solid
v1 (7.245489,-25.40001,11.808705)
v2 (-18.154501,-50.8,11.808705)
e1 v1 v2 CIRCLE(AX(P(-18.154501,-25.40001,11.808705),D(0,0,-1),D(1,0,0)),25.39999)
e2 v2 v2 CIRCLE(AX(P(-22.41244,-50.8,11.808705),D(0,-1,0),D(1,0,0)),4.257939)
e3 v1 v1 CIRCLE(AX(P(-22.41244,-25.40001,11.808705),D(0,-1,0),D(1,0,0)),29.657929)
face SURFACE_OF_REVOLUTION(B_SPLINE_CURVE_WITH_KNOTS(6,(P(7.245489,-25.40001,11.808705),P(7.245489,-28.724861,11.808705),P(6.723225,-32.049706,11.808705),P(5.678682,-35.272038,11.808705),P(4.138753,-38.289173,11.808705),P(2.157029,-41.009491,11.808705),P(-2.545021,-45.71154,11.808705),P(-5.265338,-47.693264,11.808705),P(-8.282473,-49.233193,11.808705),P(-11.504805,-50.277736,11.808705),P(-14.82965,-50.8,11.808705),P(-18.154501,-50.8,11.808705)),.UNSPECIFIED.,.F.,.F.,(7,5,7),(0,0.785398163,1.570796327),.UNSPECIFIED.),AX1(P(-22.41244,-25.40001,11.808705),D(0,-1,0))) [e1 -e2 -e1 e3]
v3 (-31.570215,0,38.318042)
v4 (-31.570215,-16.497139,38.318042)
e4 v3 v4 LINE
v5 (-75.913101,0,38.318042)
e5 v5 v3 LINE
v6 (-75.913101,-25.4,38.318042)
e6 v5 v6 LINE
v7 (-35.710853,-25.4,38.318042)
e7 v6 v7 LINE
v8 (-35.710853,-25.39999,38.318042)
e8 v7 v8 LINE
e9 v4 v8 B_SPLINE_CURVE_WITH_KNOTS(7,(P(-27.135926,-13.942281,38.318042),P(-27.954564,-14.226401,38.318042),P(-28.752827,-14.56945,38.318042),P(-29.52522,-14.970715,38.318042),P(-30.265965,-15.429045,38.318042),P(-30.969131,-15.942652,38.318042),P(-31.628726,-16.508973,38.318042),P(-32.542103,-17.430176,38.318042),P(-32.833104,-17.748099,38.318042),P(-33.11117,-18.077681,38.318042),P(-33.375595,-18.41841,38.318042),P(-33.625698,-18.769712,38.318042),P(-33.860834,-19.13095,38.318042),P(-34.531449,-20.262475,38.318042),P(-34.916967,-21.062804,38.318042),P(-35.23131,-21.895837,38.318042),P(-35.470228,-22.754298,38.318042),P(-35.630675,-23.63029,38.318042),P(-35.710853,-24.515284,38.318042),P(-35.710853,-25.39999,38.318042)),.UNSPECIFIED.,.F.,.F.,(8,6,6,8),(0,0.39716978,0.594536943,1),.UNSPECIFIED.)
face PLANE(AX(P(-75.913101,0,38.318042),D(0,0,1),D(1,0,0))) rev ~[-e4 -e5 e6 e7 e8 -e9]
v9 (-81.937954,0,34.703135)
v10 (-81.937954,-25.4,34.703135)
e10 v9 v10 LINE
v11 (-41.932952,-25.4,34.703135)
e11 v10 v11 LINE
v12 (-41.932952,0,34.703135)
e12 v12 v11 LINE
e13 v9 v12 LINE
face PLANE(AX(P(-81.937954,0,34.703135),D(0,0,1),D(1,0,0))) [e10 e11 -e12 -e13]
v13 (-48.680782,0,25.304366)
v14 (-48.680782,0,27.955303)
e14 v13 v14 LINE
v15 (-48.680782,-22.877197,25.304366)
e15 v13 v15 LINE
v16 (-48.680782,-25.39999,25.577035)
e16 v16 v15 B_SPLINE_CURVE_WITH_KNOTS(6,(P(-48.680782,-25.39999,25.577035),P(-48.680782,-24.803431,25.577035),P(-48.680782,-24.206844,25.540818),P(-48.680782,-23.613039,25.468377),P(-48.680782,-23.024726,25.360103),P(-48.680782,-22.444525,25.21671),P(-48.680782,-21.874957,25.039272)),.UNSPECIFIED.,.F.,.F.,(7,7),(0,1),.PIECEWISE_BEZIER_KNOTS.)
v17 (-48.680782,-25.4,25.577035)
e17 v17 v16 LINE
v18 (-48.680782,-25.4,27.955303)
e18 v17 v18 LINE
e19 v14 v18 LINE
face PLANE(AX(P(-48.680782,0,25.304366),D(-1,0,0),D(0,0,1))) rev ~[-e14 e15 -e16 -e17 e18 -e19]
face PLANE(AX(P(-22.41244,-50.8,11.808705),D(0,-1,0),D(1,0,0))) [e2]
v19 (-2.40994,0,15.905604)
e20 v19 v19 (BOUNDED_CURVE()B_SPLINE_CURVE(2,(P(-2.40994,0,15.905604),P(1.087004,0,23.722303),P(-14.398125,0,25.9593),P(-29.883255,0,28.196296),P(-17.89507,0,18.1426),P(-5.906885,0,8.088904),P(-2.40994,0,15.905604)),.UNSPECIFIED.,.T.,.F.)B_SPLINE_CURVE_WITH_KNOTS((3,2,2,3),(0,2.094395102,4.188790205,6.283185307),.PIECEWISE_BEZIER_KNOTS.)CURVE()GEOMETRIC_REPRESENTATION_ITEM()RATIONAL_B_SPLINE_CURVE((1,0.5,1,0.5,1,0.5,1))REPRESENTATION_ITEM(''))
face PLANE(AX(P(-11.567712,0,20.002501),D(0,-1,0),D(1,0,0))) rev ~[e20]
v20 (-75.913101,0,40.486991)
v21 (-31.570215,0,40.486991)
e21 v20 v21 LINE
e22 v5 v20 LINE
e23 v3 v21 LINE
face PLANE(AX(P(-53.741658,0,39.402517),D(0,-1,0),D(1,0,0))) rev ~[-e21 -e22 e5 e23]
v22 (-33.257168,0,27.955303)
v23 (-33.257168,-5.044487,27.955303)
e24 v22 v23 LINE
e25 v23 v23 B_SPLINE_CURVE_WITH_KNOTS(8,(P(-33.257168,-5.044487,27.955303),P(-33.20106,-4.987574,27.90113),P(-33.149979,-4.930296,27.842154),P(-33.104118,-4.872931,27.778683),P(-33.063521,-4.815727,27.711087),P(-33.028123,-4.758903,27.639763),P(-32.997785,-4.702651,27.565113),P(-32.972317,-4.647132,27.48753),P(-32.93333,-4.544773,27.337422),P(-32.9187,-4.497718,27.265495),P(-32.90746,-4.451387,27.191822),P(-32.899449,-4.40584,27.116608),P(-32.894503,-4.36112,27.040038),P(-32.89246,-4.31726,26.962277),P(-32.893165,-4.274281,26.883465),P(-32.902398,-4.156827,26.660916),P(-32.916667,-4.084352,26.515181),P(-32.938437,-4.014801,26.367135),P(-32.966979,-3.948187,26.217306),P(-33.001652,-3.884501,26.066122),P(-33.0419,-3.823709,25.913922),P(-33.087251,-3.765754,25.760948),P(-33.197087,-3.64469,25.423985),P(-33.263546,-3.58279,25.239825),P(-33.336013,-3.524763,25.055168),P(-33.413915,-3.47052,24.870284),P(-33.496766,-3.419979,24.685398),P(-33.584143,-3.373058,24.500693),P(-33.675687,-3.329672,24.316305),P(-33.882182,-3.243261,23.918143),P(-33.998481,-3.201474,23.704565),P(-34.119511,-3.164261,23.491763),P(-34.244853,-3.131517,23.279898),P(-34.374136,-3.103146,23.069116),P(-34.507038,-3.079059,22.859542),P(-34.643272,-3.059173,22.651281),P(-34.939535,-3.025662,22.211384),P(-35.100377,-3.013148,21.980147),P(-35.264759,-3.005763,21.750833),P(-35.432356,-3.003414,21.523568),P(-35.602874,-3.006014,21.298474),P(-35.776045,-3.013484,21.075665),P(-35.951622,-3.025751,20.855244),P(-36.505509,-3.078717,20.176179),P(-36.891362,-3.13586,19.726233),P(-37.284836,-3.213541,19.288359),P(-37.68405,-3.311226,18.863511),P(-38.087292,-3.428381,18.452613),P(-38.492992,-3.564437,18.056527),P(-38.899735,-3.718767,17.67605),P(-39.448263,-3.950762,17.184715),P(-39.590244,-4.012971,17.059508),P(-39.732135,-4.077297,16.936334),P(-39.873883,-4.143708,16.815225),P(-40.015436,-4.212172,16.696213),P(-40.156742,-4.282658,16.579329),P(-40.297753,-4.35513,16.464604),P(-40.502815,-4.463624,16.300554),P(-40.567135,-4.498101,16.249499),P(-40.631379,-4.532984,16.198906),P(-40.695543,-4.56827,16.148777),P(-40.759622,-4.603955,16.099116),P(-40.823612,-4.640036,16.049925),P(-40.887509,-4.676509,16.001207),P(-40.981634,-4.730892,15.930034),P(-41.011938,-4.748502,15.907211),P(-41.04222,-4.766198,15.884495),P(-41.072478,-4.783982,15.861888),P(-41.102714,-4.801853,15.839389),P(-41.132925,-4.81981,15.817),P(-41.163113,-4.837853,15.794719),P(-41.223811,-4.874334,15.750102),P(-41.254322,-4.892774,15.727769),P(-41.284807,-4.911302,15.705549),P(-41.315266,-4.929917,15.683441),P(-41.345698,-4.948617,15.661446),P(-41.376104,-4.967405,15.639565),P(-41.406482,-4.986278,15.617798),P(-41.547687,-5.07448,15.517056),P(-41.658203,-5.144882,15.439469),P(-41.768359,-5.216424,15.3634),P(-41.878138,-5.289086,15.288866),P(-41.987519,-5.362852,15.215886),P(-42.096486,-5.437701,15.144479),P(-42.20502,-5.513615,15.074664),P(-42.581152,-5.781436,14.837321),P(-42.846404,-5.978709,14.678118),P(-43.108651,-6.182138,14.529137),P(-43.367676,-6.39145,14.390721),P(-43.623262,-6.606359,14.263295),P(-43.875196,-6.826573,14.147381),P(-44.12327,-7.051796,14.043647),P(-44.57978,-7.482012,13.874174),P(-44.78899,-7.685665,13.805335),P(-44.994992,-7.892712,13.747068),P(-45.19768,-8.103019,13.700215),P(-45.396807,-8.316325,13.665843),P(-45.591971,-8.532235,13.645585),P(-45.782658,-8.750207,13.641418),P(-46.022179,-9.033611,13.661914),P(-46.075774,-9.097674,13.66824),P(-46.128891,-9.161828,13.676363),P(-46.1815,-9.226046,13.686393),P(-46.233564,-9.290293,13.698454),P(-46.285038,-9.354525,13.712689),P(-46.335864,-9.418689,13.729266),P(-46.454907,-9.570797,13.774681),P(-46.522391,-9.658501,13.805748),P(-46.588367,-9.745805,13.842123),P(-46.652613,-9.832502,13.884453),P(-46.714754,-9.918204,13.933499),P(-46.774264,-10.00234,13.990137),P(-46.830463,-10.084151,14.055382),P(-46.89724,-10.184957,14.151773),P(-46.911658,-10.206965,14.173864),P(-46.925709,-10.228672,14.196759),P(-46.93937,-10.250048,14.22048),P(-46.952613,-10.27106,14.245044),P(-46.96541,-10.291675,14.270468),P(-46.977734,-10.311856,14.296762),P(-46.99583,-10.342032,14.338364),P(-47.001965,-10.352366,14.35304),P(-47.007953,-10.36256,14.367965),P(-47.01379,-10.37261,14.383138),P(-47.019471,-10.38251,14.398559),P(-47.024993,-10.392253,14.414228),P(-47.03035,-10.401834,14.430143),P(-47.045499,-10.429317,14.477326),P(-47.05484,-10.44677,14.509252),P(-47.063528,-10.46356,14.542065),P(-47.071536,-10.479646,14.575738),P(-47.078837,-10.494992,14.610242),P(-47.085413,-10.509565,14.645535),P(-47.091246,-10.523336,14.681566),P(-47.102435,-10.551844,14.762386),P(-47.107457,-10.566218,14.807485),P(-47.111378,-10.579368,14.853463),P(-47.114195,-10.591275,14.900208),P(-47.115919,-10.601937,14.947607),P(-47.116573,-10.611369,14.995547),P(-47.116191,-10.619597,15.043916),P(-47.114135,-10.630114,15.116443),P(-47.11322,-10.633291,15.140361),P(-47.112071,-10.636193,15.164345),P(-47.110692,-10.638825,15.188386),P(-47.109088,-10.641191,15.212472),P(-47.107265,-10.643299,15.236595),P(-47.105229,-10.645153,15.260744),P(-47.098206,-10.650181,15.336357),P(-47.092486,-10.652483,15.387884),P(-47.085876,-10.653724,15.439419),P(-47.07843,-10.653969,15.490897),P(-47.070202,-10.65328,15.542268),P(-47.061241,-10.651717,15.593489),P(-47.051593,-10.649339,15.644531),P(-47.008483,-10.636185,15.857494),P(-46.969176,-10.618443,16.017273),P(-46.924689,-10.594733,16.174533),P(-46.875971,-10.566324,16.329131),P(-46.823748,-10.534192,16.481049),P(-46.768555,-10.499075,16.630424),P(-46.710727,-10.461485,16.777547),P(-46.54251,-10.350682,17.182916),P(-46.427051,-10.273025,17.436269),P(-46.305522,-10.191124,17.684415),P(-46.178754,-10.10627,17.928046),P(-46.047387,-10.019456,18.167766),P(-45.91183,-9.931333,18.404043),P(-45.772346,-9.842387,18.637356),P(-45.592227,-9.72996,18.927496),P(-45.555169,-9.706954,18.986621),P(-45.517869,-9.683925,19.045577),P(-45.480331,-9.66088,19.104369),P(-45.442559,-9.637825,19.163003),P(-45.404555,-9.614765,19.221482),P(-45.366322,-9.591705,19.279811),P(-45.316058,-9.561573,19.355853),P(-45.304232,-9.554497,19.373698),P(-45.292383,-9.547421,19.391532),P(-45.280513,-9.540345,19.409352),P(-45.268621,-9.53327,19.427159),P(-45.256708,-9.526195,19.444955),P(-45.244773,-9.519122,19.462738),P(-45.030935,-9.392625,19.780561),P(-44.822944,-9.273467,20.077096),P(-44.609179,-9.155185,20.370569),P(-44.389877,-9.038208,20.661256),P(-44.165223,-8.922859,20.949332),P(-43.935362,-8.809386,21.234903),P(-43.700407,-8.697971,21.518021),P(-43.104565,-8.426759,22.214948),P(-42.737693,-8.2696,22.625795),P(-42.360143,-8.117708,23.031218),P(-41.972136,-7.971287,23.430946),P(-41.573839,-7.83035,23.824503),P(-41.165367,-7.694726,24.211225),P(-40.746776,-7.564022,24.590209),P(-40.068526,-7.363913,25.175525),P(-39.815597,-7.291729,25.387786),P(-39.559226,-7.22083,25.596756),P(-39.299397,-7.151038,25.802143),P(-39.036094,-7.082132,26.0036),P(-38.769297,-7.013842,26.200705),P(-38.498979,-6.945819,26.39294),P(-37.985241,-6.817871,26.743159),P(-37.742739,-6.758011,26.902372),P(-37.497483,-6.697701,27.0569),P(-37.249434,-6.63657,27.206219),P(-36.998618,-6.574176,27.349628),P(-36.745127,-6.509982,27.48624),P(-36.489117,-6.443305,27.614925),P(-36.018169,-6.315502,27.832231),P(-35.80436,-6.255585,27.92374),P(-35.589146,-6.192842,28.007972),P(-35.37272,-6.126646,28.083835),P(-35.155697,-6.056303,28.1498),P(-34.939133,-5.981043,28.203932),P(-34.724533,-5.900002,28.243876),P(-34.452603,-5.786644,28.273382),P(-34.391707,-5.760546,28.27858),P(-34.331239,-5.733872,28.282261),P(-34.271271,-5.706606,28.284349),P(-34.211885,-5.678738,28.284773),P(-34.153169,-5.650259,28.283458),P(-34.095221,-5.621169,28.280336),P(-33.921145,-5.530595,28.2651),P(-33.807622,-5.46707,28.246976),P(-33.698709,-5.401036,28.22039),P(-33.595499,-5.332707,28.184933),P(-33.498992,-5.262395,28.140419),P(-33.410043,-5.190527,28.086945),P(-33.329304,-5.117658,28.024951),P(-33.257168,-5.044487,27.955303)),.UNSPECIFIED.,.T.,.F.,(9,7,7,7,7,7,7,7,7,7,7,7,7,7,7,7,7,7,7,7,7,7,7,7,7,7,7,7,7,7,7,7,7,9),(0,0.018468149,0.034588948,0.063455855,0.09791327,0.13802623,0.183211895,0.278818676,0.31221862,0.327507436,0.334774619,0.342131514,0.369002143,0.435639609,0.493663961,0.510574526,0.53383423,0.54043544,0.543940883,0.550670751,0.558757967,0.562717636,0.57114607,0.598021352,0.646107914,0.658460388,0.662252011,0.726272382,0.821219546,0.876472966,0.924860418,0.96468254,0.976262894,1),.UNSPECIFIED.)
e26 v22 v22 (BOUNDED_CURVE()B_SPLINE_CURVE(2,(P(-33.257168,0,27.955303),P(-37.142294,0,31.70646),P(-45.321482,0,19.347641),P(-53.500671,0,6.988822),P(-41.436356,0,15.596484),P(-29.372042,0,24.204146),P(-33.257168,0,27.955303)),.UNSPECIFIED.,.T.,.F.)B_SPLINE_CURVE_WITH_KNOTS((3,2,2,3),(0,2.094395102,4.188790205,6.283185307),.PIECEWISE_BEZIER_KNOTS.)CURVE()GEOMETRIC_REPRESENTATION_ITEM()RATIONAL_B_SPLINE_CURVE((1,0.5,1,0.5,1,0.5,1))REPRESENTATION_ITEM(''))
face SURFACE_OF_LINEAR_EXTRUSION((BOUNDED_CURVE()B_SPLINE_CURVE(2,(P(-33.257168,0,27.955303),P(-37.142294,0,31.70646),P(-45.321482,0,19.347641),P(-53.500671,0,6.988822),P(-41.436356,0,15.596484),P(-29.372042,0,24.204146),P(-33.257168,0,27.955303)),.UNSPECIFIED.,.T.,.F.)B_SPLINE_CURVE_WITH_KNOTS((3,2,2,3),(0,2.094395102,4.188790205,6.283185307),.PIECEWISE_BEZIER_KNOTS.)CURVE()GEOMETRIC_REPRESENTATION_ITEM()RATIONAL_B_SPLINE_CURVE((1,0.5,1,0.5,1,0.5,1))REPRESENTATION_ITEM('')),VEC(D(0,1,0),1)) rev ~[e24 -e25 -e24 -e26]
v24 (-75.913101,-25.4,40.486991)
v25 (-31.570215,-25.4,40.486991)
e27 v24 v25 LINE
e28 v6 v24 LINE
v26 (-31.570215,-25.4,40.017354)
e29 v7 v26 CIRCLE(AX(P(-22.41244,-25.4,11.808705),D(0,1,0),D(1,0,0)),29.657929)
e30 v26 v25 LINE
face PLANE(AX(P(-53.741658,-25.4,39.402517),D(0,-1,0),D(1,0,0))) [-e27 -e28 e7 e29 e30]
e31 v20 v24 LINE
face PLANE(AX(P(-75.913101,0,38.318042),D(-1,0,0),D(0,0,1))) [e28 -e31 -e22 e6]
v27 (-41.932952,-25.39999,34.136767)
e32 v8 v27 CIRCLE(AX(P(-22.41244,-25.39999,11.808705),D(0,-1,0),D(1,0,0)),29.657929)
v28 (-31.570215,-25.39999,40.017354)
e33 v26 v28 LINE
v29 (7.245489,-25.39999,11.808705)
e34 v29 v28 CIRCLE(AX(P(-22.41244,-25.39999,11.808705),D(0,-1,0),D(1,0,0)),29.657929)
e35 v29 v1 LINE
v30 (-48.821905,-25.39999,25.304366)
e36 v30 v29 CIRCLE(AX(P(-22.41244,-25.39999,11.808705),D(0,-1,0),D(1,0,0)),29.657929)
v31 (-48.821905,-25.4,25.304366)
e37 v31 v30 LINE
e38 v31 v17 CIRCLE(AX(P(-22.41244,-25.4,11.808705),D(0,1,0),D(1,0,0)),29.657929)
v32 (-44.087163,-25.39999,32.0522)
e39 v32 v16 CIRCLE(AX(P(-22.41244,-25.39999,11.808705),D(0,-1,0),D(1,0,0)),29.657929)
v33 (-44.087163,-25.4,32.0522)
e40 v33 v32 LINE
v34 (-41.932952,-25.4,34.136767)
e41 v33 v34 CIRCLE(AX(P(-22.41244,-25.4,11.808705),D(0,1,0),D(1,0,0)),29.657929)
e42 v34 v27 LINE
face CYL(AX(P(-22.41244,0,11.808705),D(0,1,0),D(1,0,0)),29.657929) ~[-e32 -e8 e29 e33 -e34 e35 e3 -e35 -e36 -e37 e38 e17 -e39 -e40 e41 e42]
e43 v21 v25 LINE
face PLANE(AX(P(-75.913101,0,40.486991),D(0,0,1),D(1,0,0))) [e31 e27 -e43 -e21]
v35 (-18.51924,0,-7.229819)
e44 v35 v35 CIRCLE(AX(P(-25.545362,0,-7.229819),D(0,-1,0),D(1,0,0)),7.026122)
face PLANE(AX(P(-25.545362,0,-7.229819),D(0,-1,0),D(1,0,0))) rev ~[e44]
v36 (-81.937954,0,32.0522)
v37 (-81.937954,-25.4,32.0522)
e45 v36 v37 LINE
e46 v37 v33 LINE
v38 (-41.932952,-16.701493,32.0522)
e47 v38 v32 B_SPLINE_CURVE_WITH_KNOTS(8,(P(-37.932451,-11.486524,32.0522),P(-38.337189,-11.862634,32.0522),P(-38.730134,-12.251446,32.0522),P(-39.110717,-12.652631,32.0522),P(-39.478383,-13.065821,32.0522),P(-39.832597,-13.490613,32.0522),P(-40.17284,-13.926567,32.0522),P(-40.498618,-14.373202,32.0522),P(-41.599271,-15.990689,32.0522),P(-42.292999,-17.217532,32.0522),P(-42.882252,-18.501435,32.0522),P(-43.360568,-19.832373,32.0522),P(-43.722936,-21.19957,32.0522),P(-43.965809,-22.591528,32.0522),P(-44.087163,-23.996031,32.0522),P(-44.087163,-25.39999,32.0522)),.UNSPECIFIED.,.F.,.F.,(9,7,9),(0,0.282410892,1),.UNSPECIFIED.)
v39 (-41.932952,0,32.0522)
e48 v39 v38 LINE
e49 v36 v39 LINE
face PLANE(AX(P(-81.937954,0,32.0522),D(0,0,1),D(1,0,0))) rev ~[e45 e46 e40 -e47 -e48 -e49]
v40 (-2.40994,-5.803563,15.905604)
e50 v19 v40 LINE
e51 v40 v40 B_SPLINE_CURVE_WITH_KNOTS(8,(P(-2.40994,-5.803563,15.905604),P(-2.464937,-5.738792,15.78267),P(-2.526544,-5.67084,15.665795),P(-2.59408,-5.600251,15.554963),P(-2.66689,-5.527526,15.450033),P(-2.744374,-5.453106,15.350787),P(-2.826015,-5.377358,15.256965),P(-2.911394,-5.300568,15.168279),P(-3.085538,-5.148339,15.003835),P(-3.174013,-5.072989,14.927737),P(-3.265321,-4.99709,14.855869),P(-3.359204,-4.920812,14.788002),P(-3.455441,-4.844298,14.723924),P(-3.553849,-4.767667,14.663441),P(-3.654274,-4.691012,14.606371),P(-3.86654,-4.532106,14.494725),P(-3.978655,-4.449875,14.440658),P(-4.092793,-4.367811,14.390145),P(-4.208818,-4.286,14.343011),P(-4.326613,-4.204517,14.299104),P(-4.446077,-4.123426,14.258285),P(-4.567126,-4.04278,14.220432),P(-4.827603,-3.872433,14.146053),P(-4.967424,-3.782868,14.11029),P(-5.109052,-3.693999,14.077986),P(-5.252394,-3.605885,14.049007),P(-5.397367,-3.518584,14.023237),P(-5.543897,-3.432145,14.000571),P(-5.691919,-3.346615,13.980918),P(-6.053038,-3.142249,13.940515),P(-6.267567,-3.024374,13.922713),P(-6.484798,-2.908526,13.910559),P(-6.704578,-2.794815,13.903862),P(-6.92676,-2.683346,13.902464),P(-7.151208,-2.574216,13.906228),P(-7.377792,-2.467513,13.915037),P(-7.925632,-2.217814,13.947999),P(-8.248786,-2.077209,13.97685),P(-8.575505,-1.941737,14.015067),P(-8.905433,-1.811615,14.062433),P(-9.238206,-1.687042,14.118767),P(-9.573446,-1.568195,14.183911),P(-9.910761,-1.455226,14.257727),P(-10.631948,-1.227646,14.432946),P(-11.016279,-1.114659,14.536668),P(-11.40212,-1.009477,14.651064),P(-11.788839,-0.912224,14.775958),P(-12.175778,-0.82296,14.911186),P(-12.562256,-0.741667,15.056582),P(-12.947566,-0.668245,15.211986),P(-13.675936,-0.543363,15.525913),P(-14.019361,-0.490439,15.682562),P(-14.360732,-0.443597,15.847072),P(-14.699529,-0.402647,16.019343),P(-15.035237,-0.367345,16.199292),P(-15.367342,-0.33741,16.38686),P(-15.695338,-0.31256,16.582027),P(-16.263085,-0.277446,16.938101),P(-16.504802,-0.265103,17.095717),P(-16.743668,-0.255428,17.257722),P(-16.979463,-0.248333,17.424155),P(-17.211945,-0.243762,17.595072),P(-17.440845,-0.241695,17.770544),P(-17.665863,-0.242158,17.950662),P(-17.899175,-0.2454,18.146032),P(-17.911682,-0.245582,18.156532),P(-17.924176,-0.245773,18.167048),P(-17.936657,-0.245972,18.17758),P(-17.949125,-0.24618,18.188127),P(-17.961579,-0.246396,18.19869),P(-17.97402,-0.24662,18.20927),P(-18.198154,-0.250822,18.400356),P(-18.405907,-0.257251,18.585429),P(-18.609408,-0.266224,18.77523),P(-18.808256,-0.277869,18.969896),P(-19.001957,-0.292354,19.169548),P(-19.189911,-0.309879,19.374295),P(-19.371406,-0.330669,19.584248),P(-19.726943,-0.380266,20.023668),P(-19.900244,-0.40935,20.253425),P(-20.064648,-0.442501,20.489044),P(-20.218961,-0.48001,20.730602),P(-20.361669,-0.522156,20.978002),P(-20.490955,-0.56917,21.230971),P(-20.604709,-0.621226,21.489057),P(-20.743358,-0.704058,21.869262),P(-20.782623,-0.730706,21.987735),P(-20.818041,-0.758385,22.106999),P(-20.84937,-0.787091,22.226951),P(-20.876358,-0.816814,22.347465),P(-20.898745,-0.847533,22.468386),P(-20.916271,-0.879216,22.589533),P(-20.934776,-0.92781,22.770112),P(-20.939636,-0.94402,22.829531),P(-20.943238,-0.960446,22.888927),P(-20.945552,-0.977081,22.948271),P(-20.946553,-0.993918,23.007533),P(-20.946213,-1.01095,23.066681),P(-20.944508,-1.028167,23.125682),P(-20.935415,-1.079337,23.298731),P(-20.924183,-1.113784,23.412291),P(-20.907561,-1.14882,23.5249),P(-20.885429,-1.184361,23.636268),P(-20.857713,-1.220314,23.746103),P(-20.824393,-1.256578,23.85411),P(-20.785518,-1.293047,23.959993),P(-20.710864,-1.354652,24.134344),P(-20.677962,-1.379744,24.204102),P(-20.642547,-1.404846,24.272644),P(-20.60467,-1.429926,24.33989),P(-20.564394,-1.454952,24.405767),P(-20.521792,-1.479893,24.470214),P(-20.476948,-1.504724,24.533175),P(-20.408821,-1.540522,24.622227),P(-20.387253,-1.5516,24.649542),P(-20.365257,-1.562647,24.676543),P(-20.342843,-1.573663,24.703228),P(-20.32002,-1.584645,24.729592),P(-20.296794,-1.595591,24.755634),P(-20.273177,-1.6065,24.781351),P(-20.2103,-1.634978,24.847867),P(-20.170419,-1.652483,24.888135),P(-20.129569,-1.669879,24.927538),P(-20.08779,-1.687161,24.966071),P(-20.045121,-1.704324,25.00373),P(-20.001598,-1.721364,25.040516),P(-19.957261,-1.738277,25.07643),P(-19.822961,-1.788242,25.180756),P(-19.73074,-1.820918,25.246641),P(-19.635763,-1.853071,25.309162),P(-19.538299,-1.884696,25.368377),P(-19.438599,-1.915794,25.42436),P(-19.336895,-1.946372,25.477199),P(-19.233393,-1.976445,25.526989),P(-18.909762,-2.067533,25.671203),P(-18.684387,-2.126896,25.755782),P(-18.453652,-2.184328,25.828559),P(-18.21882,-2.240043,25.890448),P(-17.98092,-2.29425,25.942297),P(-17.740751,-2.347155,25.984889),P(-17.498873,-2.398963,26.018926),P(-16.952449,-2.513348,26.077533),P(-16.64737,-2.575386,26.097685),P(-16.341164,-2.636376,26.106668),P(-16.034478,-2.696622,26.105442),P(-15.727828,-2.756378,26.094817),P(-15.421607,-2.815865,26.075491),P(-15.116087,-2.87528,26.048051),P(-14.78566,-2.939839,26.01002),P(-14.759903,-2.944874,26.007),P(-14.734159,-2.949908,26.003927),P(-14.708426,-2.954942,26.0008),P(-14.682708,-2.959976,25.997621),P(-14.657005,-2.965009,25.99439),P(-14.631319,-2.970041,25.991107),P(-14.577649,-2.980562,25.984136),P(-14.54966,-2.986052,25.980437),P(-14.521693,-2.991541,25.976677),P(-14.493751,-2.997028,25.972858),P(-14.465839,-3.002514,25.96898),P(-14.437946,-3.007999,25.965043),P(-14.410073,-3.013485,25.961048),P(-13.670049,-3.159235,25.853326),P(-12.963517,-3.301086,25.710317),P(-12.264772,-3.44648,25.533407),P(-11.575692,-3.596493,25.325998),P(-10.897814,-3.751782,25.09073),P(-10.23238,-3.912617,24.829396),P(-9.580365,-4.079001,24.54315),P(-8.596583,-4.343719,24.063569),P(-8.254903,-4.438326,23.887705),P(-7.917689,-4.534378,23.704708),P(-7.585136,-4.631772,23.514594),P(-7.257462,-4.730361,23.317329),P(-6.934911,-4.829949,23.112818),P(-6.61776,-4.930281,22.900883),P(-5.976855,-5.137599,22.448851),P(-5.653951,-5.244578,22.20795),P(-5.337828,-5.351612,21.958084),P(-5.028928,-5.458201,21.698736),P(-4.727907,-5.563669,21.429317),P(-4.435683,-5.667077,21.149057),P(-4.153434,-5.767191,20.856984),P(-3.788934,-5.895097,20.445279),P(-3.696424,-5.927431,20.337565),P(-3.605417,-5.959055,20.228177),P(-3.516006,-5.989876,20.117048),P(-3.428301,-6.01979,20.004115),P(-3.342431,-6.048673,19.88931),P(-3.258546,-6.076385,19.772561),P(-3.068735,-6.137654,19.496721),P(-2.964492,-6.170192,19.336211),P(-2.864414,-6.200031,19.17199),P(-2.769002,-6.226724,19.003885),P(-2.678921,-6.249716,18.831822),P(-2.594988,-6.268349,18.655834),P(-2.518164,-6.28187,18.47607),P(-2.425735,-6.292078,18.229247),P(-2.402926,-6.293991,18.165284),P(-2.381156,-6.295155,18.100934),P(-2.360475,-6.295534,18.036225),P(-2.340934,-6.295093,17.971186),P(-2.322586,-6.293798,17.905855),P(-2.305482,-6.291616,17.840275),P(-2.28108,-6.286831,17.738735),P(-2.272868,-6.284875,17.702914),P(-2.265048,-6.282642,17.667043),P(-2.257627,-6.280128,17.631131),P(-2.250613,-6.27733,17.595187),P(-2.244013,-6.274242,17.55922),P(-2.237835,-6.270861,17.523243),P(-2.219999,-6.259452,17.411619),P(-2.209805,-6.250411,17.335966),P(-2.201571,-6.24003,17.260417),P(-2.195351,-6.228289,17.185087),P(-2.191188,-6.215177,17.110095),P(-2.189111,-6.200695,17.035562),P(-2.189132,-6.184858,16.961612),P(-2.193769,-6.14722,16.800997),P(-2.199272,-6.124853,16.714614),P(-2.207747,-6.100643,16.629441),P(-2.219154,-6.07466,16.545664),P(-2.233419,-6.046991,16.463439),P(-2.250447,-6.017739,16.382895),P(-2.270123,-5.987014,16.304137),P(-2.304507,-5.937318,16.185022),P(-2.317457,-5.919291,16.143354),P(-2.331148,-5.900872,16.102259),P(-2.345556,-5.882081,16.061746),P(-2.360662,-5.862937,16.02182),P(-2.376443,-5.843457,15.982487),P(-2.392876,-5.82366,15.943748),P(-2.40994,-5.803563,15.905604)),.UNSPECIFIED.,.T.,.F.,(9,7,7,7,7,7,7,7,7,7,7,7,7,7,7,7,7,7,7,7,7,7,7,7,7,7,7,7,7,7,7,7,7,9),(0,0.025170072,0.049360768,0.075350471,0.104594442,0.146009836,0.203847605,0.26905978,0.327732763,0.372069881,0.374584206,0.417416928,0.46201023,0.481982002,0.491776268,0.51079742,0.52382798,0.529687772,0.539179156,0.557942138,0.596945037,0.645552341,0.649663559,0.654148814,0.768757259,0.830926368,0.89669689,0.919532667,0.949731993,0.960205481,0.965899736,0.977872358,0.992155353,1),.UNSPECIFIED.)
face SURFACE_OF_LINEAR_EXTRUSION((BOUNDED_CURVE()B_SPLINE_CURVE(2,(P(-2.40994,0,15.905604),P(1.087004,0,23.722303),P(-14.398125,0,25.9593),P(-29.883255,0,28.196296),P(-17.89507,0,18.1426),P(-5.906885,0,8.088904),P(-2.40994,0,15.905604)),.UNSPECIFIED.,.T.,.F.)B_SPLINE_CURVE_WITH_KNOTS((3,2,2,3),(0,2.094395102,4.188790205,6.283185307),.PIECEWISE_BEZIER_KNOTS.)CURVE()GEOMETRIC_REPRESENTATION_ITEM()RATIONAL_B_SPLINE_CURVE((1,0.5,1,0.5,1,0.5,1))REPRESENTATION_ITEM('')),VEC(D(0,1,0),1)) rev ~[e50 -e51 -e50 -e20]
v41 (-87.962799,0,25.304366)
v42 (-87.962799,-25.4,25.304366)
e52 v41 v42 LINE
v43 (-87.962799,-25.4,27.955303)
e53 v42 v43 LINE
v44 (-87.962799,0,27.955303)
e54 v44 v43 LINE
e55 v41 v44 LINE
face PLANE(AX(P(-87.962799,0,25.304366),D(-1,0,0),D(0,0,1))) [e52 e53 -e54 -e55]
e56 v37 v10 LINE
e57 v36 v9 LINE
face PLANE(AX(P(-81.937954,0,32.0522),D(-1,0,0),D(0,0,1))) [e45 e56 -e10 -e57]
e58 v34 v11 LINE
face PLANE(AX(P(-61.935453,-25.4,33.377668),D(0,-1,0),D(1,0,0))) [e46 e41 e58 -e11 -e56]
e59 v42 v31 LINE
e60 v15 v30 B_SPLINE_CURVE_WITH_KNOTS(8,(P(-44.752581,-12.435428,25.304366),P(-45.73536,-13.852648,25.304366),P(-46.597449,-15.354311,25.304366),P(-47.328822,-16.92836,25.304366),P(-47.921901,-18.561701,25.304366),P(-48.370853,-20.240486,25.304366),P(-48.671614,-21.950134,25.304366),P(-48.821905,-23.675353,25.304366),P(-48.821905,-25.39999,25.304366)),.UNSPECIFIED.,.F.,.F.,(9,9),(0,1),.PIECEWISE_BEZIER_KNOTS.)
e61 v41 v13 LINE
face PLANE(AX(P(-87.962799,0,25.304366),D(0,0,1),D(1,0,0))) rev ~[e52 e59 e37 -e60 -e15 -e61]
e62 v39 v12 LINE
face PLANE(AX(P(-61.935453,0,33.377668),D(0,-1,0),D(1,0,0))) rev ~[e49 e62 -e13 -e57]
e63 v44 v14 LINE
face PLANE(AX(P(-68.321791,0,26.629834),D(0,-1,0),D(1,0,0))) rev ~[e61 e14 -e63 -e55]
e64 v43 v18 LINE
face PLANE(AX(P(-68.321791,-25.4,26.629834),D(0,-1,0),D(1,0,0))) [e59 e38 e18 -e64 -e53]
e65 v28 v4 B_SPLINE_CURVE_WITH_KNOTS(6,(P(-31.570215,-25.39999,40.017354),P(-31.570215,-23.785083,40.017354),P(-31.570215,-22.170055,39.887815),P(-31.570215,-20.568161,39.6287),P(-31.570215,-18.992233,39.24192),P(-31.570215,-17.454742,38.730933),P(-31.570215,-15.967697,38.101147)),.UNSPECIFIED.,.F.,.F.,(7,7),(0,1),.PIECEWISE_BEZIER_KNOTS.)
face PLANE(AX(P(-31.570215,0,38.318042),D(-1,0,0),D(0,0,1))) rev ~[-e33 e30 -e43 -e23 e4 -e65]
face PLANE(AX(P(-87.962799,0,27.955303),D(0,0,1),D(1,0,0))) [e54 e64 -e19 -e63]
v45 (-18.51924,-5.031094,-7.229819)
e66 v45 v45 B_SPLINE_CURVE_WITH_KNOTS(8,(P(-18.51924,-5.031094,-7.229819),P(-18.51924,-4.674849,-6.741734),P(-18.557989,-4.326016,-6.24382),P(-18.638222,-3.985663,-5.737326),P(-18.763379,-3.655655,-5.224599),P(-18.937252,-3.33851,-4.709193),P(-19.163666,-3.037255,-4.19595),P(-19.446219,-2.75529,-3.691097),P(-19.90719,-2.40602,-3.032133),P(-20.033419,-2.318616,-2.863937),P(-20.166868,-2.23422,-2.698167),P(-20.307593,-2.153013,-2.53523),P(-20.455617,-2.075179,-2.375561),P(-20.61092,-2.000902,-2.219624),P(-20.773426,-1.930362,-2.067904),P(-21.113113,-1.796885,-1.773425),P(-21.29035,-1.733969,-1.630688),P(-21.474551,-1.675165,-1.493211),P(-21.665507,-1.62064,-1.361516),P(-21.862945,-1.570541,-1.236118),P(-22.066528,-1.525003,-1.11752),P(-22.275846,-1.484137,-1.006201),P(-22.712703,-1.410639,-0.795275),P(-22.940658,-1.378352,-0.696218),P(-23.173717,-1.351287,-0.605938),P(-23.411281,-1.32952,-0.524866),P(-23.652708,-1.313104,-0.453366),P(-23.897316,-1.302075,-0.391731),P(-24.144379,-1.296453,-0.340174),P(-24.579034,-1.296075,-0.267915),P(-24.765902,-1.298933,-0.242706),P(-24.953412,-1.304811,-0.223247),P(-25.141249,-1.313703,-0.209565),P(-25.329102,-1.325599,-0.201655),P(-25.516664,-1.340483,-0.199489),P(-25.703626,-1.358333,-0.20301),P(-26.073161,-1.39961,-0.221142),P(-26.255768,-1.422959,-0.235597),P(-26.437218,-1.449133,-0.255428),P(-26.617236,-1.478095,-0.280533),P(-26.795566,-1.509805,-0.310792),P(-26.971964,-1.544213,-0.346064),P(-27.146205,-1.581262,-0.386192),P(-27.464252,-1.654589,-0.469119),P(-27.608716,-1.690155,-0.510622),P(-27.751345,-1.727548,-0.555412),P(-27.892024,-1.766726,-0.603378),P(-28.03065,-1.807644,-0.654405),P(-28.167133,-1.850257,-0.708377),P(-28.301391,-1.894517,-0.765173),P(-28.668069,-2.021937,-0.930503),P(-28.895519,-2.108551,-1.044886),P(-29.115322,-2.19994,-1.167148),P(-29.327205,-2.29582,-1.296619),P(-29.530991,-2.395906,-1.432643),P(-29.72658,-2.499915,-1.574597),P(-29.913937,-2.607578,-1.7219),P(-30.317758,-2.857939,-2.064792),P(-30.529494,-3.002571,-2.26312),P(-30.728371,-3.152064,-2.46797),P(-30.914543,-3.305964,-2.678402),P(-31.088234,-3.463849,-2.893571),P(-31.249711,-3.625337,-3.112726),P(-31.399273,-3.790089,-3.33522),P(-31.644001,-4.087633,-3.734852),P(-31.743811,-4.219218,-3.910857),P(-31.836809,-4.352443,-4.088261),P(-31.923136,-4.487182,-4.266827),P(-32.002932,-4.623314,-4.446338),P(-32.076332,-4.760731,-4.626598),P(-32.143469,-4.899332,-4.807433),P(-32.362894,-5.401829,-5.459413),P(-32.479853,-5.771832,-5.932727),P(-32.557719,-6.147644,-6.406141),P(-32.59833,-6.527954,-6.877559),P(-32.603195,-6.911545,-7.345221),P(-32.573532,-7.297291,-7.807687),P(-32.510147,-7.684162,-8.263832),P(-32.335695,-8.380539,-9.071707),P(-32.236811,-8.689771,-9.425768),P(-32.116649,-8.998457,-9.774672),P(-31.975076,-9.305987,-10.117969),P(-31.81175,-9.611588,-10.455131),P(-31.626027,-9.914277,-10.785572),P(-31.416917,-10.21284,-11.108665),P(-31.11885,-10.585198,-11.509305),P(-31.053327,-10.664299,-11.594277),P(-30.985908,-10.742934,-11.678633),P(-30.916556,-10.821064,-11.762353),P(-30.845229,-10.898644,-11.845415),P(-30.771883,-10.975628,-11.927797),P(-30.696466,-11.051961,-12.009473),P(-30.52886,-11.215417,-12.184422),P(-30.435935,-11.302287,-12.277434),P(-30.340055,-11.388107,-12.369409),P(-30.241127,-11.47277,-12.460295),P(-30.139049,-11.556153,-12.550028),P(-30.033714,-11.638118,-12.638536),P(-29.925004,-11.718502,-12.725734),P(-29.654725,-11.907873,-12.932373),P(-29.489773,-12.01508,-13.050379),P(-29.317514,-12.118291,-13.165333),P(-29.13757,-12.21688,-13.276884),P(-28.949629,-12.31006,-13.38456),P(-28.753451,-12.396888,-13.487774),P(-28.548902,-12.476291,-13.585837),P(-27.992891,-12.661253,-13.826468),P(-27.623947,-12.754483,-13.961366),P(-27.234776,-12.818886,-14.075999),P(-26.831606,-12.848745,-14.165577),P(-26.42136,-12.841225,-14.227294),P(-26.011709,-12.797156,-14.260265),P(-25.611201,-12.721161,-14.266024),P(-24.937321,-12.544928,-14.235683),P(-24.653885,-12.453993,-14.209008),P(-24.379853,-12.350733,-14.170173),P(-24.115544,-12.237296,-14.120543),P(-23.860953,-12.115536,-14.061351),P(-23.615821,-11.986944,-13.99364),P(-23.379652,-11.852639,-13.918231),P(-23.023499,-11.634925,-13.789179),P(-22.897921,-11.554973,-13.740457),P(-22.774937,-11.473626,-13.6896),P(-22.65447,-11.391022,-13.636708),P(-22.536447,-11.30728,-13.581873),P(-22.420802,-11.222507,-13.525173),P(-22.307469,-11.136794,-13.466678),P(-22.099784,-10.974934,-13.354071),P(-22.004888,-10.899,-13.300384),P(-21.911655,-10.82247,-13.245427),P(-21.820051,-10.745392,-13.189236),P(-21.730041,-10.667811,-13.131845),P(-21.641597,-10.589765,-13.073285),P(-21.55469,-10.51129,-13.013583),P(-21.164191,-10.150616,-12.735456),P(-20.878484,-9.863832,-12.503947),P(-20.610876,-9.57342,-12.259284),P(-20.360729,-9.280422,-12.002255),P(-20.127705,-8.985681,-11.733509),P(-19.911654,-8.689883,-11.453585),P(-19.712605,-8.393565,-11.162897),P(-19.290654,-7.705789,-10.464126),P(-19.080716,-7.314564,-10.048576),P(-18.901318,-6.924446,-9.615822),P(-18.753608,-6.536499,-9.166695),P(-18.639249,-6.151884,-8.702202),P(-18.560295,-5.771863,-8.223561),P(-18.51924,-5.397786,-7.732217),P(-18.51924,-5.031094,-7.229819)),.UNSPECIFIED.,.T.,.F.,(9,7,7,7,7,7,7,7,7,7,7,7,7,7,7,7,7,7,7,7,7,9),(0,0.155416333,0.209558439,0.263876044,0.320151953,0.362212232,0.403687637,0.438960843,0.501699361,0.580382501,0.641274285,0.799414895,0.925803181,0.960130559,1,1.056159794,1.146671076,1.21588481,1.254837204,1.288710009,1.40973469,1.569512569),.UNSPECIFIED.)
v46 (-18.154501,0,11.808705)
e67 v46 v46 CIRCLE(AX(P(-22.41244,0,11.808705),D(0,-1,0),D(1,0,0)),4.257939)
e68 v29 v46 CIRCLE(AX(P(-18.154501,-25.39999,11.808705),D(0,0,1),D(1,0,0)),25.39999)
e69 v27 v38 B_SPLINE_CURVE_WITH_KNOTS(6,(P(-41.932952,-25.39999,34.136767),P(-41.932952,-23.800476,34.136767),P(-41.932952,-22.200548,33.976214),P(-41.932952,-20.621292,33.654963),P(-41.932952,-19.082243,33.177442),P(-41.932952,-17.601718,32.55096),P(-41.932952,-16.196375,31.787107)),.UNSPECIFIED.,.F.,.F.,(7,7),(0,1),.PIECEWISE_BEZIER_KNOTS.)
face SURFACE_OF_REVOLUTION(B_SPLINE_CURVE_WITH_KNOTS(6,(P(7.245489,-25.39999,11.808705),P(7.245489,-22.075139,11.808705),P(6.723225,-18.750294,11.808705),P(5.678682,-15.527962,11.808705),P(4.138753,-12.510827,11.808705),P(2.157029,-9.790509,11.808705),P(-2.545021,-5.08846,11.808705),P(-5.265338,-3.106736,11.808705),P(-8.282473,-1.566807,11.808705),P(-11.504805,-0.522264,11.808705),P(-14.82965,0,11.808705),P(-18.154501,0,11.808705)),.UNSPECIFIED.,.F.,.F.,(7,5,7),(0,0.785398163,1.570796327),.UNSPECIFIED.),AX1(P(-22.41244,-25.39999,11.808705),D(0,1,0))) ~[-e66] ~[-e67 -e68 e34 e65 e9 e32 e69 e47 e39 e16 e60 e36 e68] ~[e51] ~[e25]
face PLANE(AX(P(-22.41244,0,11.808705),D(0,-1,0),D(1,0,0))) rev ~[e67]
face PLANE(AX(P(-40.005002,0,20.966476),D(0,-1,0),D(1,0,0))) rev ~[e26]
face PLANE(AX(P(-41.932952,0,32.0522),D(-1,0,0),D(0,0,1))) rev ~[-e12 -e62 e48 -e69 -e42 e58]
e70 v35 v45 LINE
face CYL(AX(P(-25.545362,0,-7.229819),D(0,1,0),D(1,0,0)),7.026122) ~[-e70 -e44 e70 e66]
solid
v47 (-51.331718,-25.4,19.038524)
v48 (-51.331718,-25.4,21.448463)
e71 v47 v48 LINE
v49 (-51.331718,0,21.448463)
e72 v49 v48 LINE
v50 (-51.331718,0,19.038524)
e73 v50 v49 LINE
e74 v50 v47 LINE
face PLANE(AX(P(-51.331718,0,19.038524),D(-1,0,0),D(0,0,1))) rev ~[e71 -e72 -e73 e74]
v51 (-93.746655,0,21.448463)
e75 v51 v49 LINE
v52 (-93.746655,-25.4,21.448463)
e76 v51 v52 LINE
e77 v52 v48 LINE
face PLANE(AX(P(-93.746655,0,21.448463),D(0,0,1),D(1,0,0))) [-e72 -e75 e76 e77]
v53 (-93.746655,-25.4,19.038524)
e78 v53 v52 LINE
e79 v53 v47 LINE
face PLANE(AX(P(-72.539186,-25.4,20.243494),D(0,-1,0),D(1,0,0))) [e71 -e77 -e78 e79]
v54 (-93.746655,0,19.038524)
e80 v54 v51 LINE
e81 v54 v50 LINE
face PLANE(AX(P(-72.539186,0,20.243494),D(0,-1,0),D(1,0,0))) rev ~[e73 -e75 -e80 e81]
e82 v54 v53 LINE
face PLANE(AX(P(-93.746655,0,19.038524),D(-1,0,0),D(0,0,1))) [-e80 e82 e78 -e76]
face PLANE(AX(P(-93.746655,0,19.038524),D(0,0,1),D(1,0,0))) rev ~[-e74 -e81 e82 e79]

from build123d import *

# Parameters (mm, degrees)
F0_R     = 29.6579287445
F1_DEPTH = 50.8
F2_R     = 25.39999
F3_R     = 7.026121943
F3_W     = 44.3428866565
F3_H     = 2.1689496934
F3_W_2   = 40.0050021708
F3_H_2   = 2.6509352028
F3_W_3   = 39.2820164561
F3_H_3   = 2.6509370655
F5_DEPTH = 25.4
F3_W_4   = 42.4149371684
F3_H_4   = 2.4099387228


# Not quite as in the source:
# - a fillet or chamfer is up to 0.001 mm smaller than in the source, because OpenCascade refuses the exact size
# - the program builds the solid bodies; features that only make, move or delete a surface that nothing else refers to are left out


with BuildPart() as f1:
    # F0 (on Front) → F1 (new body)
    with BuildSketch(Plane.XZ):
        with Locations((-22.4124398082, 11.8087045848)):
            Circle(F0_R)
    extrude(amount=F1_DEPTH)

    # F2 (radius 25.4 in the source; OpenCascade refuses exactly that, so slightly less here)
    f2_edges = [f1.edges().sort_by_distance(p)[0] for p in [
        (-52.070369, -50.8, 11.808705),
        (-52.070369, 0, 11.808705),
    ]]
    fillet(f2_edges, radius=F2_R)

    # F3 (on Front) → F5 (join)
    with BuildSketch(Plane.XZ):
        with BuildLine():
            add(Edge.make_bspline(
                [(-33.2571677864, 27.9553029686), (-37.1422937885, 31.7064598227), (-45.3214823641, 19.3476406869), (-53.5006709397, 6.9888215512), (-41.436356362, 15.5964838329), (-29.3720417843, 24.2041461146), (-33.2571677864, 27.9553029686)],
                knots=[0, 0, 0, 2.0943951024, 2.0943951024, 4.1887902048, 4.1887902048, 6.2831853072, 6.2831853072, 6.2831853072], degree=2, weights=[1, 0.5, 1, 0.5, 1, 0.5, 1]))
        make_face()
        with BuildLine():
            add(Edge.make_bspline(
                [(-2.4099403527, 15.9056037664), (1.0870038831, 23.7223034997), (-14.398125451, 25.9592996115), (-29.8832547851, 28.1962957233), (-17.8950696867, 18.1425998783), (-5.9068845884, 8.0889040332), (-2.4099403527, 15.9056037664)],
                knots=[0, 0, 0, 2.0943951024, 2.0943951024, 4.1887902048, 4.1887902048, 6.2831853072, 6.2831853072, 6.2831853072], degree=2, weights=[1, 0.5, 1, 0.5, 1, 0.5, 1]))
        make_face()
        with Locations((-25.5453623831, -7.2298194282)):
            Circle(F3_R)
        with Locations((-53.7416581064, 39.4025165588)):
            Rectangle(F3_W, F3_H)
        with Locations((-61.9354527444, 33.377667889)):
            Rectangle(F3_W_2, F3_H_2)
        with Locations((-68.3217905462, 26.6298344359)):
            Rectangle(F3_W_3, F3_H_3)
    extrude(amount=F5_DEPTH)


with BuildPart() as f5:
    # F3 (on Front) → F5, piece 2 (new body)
    with BuildSketch(Plane.XZ):
        with Locations((-72.5391861051, 20.2434938401)):
            Rectangle(F3_W_4, F3_H_4)
    extrude(amount=F5_DEPTH)


solid = Compound([f1.part, f5.part])
